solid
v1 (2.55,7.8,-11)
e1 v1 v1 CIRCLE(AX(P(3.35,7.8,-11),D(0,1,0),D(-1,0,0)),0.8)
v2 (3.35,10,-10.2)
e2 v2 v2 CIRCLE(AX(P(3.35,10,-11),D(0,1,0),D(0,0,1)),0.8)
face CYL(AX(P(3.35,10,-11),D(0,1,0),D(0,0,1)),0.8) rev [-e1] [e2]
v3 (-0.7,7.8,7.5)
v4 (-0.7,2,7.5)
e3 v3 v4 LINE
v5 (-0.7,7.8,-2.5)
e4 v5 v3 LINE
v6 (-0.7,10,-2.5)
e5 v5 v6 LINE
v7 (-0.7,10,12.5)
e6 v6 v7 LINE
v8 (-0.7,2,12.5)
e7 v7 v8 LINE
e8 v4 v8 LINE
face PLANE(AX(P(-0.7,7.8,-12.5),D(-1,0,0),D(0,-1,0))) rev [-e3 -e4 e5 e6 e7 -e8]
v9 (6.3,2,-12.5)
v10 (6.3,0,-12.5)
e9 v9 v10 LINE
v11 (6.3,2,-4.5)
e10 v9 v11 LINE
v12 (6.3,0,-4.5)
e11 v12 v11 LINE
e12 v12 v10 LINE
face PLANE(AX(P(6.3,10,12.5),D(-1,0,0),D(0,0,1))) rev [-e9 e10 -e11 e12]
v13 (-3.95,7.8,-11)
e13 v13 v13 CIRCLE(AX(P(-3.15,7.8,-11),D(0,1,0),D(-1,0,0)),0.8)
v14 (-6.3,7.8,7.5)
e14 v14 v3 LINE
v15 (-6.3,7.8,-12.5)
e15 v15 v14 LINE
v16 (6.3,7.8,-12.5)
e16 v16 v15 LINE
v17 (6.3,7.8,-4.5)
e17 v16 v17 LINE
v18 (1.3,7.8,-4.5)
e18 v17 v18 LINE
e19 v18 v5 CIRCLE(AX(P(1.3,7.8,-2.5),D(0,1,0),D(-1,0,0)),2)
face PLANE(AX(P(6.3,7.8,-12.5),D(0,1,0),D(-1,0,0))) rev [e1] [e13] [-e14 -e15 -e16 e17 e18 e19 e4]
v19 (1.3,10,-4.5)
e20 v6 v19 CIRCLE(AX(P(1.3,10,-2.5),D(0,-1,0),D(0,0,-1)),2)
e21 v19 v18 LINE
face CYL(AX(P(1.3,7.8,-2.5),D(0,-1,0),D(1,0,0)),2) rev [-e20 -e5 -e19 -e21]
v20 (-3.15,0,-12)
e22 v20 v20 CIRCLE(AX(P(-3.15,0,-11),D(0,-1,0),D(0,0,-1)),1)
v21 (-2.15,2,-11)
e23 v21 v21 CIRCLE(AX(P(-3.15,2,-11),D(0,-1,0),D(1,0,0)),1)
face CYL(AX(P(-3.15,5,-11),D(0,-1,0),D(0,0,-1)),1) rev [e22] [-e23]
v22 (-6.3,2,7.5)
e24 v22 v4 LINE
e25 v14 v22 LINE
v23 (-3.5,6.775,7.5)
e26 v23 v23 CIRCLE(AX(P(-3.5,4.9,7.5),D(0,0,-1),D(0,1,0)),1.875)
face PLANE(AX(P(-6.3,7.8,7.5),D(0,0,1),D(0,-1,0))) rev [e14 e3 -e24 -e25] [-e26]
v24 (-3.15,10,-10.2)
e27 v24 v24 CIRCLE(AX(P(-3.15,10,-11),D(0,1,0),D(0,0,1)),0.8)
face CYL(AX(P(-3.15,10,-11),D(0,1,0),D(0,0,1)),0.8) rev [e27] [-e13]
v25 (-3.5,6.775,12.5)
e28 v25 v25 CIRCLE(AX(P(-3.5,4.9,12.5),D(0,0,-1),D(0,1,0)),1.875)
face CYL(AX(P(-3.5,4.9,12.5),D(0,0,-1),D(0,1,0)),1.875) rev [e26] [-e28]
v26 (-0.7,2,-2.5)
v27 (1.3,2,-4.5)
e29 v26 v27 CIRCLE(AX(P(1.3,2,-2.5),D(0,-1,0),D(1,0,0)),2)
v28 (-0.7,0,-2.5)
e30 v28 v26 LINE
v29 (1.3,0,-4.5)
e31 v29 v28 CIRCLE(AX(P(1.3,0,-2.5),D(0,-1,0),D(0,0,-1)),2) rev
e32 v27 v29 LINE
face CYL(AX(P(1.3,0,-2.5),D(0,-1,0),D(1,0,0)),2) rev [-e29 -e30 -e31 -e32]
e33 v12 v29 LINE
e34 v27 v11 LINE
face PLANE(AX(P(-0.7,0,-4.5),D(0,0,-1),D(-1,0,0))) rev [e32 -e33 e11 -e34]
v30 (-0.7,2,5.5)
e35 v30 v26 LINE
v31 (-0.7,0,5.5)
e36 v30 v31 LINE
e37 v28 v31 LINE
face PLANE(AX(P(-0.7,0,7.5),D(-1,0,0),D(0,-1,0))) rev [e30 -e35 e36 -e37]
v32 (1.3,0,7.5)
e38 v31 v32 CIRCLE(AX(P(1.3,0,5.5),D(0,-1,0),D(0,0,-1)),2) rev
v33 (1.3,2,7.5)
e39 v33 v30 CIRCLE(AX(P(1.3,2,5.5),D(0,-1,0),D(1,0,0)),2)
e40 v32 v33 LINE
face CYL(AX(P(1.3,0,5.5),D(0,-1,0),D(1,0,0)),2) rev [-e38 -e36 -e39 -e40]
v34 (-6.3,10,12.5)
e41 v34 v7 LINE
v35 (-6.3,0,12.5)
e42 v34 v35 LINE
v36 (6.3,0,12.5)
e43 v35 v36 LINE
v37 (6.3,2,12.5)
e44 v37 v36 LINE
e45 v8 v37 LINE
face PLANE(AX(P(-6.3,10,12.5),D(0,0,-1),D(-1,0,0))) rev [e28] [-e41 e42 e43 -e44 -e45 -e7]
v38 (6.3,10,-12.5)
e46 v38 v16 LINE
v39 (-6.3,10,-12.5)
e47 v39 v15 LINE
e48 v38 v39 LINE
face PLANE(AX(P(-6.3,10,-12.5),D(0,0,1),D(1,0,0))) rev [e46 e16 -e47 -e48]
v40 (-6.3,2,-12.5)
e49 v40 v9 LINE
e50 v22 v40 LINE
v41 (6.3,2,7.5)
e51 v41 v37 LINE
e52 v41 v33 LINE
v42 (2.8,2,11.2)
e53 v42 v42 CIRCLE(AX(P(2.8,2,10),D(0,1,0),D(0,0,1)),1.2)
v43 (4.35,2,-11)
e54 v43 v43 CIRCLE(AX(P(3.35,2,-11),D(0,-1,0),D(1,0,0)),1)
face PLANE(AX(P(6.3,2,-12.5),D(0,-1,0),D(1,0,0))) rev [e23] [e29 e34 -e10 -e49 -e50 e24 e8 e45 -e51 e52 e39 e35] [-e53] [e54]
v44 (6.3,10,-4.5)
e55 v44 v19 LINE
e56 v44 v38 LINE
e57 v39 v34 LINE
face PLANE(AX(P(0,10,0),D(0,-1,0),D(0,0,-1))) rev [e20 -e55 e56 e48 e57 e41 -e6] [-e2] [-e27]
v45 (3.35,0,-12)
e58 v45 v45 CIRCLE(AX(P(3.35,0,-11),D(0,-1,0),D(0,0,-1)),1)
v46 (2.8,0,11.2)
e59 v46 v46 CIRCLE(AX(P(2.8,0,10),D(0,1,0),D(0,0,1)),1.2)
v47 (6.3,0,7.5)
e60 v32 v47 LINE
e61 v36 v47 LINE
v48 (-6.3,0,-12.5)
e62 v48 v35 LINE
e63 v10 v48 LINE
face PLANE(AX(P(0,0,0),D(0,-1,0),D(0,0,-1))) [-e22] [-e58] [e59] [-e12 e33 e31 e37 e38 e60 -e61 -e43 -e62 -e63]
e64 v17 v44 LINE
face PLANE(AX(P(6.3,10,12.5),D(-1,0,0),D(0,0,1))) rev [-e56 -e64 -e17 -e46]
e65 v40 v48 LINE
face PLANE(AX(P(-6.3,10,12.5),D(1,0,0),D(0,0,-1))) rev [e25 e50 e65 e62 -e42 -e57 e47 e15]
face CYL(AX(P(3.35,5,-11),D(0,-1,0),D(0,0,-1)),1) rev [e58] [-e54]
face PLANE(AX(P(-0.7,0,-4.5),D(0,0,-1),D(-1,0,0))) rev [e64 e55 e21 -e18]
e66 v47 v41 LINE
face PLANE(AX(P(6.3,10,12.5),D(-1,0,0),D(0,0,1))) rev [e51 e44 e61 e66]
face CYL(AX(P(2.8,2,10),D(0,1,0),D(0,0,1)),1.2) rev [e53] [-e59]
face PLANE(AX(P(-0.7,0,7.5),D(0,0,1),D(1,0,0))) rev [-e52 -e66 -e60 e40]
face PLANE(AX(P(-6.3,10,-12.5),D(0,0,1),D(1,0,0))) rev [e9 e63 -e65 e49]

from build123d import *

# Parameters (mm, degrees)
SKETCH1_W                   = 12.6
SKETCH1_H                   = 25
BOSS_EXTRUDE1_DEPTH         = 10
SKETCH14_W                  = 7
SKETCH14_H                  = 5.8
CUT_EXTRUDE9_DEPTH          = 28.653028767
SKETCH15_W                  = 20
SKETCH15_H                  = 5.8
CUT_EXTRUDE10_DEPTH         = 18.47140521
CUT_EXTRUDE11_DEPTH         = 17.122654868
CUT_EXTRUDE11_DEPTH_BACK    = 17.122654868
SKETCH17_W                  = 7
SKETCH17_H                  = 12
SKETCH18_R                  = 1.875
CUT_EXTRUDE12_DEPTH         = 24.231228982
SKETCH19_W                  = 7
SKETCH19_H                  = 5
CUT_EXTRUDE13_DEPTH         = 2.2
FILLET2_R                   = 2
SKETCH20_R                  = 1
CUT_EXTRUDE18_DEPTH         = 5
TAP_DRILL_FOR_M2X0_4_TAP2_D = 1.6
M2_CLEARANCE_HOLE2_D        = 2.4


with BuildPart() as part:
    # Sketch1 → Boss-Extrude1 (new body)
    with BuildSketch(Plane(origin=(0, 0, 0), x_dir=(1, 0, 0), z_dir=(0, 1, 0))):
        Rectangle(SKETCH1_W, SKETCH1_H)
    extrude(amount=BOSS_EXTRUDE1_DEPTH)

    # Sketch14 → Cut-Extrude9 (cut, through all)
    with BuildSketch(Plane.XY.offset(12.5)):
        with Locations((2.8, 4.9)):
            Rectangle(SKETCH14_W, SKETCH14_H)
    extrude(amount=-CUT_EXTRUDE9_DEPTH, mode=Mode.SUBTRACT)

    # Sketch15 → Cut-Extrude10 (cut, through all)
    with BuildSketch(Plane(origin=(-0.7, 0, 0), x_dir=(0, 0, -1), z_dir=(1, 0, 0))):
        with Locations((2.5, 4.9)):
            Rectangle(SKETCH15_W, SKETCH15_H)
    extrude(amount=-CUT_EXTRUDE10_DEPTH, mode=Mode.SUBTRACT)

    # Sketch17 → Cut-Extrude11 (cut, two sides: drawn at the far end of the back side and taken through both)
    with BuildSketch(Plane(origin=(0, 2, 0), x_dir=(1, 0, 0), z_dir=(0, 1, 0)).offset(-CUT_EXTRUDE11_DEPTH_BACK)):
        with Locations((2.8, -1.5)):
            Rectangle(SKETCH17_W, SKETCH17_H)
    extrude(amount=CUT_EXTRUDE11_DEPTH + CUT_EXTRUDE11_DEPTH_BACK, mode=Mode.SUBTRACT)

    # Sketch18 → Cut-Extrude12 (cut, through all)
    with BuildSketch(Plane(origin=(0, 0, 7.5), x_dir=(-1, 0, 0), z_dir=(0, 0, -1))):
        with Locations(Location((3.5, 4.9, 0), (0, 0, 90))):
            Circle(SKETCH18_R)
    extrude(amount=-CUT_EXTRUDE12_DEPTH, mode=Mode.SUBTRACT)

    # Sketch19 → Cut-Extrude13 (cut)
    with BuildSketch(Plane(origin=(0, 10, 0), x_dir=(1, 0, 0), z_dir=(0, 1, 0))):
        with Locations((2.8, -10)):
            Rectangle(SKETCH19_W, SKETCH19_H)
    extrude(amount=-CUT_EXTRUDE13_DEPTH, mode=Mode.SUBTRACT)

    # Fillet2
    # the kernel refuses this fillet: 2 mm, written as the material it adds along each edge
    with BuildSketch(Plane(origin=(-0.7, 2, -4.5), x_dir=(1, 0, 0), z_dir=(0, -1, 0)), Plane(origin=(-0.7, 2, 7.5), x_dir=(0, 0, -1), z_dir=(0, -1, 0))) as fillet2_piece_1:
        with BuildLine():
            CenterArc((FILLET2_R, FILLET2_R), FILLET2_R, 180, 90)
            Line((0, FILLET2_R), (0, 0))
            Line((0, 0), (FILLET2_R, 0))
        make_face()
    extrude(amount=2)
    with BuildSketch(Plane(origin=(-0.7, 10, -4.5), x_dir=(1, 0, 0), z_dir=(0, -1, 0))) as fillet2_piece_2:
        with BuildLine():
            CenterArc((FILLET2_R, FILLET2_R), FILLET2_R, 180, 90)
            Line((0, FILLET2_R), (0, 0))
            Line((0, 0), (FILLET2_R, 0))
        make_face()
    extrude(amount=2.2)

    # Sketch20 → Cut-Extrude18 (cut)
    with BuildSketch(Plane.XZ):
        with Locations(Location((3.35, -11, 0), (0, 0, 270))):
            Circle(SKETCH20_R)
        with Locations(Location((-3.15, -11, 0), (0, 0, 270))):
            Circle(SKETCH20_R)
    extrude(amount=-CUT_EXTRUDE18_DEPTH, mode=Mode.SUBTRACT)

    # Tap Drill for M2x0.4 Tap2 (through all)
    with Locations(Plane(origin=(3.35, 10, -11), x_dir=(0, 0, 1), z_dir=(0, 1, 0))):
        with Locations((0, 0), (0, -6.5)):
            Hole(TAP_DRILL_FOR_M2X0_4_TAP2_D / 2)

    # M2 Clearance Hole2 (through all)
    with Locations(Plane(origin=(2.8, 2, 10), x_dir=(1, 0, 0), z_dir=(0, 1, 0))):
        with Locations((0, 0)):
            Hole(M2_CLEARANCE_HOLE2_D / 2)


solid = part.part
